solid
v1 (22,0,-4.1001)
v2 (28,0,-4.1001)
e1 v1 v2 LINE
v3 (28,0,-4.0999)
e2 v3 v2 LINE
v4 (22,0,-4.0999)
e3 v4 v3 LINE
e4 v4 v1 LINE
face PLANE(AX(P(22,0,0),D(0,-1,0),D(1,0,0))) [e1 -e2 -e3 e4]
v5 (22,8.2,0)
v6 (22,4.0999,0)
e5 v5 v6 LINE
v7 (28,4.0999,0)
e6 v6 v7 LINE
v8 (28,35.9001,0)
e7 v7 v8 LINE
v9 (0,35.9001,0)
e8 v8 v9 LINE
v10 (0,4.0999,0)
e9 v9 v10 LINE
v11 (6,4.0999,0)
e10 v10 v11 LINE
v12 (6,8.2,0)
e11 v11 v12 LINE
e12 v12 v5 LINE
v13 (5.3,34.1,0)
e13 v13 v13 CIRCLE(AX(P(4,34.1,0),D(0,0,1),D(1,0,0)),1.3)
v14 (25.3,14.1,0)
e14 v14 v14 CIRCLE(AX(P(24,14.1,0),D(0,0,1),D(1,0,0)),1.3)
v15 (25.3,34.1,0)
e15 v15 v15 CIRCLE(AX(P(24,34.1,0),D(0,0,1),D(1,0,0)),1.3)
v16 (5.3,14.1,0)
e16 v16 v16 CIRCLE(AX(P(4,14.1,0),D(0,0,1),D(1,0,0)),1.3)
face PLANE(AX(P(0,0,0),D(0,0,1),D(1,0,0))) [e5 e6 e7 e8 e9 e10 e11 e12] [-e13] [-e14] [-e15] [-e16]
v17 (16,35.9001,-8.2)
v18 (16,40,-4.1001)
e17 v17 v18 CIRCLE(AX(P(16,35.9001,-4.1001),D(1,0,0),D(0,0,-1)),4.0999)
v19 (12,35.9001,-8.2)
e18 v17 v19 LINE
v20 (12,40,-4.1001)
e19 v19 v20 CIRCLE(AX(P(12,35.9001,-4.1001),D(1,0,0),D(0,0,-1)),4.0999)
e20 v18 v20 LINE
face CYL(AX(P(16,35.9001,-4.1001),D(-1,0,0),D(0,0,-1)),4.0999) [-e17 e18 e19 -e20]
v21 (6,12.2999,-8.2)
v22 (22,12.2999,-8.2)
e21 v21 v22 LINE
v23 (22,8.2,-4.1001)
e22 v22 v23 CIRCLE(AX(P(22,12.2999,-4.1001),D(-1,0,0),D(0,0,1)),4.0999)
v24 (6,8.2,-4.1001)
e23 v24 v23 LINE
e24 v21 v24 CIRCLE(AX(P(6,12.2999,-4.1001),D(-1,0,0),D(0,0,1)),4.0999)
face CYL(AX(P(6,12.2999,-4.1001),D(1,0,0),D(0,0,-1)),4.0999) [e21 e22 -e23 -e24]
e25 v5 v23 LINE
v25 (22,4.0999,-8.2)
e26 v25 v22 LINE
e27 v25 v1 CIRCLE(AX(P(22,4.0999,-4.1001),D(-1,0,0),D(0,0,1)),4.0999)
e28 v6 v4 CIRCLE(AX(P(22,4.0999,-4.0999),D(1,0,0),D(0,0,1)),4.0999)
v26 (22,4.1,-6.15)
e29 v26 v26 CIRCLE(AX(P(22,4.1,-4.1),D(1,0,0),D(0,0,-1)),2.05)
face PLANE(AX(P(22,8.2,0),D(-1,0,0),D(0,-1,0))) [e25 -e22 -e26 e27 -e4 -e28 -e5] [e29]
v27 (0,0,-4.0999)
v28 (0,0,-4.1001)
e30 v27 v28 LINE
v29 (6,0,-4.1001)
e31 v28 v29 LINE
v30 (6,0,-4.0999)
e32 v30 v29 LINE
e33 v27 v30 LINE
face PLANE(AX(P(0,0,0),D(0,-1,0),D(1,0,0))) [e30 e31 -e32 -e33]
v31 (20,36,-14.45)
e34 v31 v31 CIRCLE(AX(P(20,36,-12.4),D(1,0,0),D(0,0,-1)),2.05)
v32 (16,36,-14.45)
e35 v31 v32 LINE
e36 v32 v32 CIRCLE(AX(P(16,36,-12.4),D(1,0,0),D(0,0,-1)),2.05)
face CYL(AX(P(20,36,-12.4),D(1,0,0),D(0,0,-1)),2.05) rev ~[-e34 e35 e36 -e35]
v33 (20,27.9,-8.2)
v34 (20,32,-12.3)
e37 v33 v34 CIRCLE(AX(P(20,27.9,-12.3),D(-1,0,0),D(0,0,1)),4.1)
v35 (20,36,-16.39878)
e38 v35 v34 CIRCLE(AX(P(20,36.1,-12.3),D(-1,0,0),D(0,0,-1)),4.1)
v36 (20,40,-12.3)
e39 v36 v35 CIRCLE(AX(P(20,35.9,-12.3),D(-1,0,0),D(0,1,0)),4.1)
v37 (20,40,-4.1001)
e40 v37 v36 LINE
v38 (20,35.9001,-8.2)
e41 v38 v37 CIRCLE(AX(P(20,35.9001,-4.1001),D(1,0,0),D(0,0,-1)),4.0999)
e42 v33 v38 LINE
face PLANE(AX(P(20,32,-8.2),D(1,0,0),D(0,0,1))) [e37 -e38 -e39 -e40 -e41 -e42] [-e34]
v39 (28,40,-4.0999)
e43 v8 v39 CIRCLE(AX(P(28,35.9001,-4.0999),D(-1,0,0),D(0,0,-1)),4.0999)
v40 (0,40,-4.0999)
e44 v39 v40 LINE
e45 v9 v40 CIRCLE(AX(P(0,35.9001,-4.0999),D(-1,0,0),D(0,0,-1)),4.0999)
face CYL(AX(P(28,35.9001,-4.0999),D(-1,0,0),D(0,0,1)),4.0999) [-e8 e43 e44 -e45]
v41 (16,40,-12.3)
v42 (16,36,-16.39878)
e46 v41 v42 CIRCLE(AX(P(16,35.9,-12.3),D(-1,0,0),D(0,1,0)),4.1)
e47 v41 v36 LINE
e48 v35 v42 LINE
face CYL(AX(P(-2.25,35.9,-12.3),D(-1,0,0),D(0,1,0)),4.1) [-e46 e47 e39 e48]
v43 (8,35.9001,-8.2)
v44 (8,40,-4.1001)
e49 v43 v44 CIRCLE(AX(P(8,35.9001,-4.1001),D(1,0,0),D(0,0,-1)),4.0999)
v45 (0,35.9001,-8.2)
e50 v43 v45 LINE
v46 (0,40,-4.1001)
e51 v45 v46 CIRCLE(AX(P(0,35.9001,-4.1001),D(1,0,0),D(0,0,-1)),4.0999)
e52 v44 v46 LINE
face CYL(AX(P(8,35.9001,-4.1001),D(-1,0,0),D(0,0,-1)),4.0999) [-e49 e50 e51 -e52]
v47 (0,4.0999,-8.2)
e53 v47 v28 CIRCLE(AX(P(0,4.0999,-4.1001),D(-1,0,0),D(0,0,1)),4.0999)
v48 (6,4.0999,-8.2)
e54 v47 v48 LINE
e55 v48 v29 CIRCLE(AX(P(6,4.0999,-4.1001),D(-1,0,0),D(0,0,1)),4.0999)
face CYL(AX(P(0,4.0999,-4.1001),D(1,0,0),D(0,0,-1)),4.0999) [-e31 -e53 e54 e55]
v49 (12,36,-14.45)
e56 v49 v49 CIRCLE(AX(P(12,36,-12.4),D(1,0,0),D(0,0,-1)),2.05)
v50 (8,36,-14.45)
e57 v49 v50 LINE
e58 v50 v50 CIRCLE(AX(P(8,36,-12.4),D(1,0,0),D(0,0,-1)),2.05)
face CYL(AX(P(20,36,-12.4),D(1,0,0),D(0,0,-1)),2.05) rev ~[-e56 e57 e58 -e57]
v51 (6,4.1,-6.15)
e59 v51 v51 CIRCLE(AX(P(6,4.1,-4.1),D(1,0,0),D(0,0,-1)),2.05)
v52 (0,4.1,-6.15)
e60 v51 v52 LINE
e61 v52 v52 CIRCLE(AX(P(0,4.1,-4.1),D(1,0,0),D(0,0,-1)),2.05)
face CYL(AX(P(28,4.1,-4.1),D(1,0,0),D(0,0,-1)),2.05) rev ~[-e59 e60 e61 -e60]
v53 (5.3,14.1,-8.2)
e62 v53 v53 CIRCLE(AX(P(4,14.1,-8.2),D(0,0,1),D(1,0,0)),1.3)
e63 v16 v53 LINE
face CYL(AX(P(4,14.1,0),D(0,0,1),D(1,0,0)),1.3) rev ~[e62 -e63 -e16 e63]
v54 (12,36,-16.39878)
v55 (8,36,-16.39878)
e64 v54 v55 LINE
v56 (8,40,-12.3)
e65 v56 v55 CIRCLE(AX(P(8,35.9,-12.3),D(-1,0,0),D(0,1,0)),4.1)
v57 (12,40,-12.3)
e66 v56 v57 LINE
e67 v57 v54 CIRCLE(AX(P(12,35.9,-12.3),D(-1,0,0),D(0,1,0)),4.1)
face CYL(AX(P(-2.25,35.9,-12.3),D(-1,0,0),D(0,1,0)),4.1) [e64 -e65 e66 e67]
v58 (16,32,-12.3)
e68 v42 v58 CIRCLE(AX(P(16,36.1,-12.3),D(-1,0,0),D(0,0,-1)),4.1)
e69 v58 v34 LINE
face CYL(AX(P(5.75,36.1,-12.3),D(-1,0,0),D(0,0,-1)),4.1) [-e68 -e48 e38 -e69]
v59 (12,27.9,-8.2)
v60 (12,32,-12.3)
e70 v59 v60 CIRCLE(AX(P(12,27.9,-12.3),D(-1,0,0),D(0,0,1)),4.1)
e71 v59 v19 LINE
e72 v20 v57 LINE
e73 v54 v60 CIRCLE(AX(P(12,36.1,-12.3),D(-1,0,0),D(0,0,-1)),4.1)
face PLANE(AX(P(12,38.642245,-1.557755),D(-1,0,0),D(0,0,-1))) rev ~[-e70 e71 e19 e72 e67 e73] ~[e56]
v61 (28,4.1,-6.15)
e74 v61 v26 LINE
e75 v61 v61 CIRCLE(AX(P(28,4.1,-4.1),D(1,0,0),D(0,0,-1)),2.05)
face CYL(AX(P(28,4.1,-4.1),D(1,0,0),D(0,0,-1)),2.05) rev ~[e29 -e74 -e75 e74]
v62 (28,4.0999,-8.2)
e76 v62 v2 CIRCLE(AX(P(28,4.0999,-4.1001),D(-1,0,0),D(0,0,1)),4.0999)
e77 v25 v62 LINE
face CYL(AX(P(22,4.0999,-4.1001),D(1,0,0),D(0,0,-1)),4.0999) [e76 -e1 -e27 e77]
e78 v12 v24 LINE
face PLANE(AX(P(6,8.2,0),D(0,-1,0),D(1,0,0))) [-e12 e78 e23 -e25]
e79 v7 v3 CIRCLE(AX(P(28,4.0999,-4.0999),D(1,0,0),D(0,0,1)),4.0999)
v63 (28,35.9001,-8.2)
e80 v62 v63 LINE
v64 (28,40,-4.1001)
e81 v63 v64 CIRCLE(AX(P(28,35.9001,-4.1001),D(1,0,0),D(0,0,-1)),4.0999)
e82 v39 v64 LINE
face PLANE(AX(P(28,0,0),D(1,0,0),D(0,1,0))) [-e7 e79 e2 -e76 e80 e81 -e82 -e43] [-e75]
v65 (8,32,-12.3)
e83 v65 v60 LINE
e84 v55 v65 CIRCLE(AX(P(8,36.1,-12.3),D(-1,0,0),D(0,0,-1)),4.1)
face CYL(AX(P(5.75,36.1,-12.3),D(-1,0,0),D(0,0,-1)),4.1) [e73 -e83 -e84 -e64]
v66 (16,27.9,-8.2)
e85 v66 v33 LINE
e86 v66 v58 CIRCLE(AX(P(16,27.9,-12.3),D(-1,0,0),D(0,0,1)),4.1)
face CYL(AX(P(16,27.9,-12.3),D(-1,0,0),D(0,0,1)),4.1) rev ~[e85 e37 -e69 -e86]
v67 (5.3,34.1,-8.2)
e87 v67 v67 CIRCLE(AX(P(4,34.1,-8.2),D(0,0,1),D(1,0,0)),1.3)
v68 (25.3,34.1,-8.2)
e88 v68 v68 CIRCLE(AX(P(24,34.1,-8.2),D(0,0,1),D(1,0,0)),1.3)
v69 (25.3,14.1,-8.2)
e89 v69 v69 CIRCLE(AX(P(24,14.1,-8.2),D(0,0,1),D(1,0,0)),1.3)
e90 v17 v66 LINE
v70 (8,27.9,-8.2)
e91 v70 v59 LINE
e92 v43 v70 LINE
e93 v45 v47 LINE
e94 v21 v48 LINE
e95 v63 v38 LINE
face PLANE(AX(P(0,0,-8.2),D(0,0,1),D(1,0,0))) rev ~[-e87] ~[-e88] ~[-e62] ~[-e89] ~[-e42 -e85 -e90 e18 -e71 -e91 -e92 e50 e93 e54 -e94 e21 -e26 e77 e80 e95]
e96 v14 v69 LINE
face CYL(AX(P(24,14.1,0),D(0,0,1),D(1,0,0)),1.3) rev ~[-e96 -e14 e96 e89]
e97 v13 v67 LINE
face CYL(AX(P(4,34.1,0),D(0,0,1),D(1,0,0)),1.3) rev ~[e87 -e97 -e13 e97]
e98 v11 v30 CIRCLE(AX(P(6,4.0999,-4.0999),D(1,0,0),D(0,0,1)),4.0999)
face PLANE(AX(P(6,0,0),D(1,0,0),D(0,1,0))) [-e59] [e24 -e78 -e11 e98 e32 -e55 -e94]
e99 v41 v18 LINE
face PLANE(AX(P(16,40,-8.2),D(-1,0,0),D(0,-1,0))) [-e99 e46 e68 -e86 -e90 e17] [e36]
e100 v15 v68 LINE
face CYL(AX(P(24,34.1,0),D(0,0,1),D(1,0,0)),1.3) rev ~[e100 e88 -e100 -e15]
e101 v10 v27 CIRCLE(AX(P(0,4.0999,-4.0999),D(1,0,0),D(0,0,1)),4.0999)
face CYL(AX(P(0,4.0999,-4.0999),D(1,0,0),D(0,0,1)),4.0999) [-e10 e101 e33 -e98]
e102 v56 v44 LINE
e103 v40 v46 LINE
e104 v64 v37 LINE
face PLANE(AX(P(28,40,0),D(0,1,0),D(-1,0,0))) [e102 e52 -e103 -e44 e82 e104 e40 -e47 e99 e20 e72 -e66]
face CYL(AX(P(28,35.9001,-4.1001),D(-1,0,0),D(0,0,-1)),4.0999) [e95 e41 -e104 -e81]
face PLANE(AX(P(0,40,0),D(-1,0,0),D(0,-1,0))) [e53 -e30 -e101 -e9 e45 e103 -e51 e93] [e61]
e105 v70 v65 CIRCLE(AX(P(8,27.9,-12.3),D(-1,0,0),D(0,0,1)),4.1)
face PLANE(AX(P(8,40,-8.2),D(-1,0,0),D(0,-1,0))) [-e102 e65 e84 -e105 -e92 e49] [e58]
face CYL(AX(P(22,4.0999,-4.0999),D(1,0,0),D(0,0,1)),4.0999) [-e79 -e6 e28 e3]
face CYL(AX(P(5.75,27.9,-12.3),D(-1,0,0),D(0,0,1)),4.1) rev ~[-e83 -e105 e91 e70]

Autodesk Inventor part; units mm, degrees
ref_plane "YZ Plane" through (0, 0, 0) normal (1, 0, 0) x (0, 1, 0)
ref_plane "XZ Plane" through (0, 0, 0) normal (0, 1, 0) x (-1, 0, 0)
ref_plane "XY Plane" through (0, 0, 0) normal (0, 0, 1) x (1, 0, 0)
sketch "Sketch1" plane through (0, 0, 0) normal (0, 0, 1) x (1, 0, 0)
  line L0 (0, 40) -> (0, 0)
  line L1 (0, 0) -> (6, 0)
  line L2 (6, 0) -> (6, 8.2)
  line L3 (6, 8.2) -> (22, 8.2)
  line L4 (22, 8.2) -> (22, 0)
  line L5 (22, 0) -> (28, 0)
  line L6 (28, 0) -> (28, 40)
  line L7 (28, 40) -> (0, 40)
  dimension "d0" = 6
  dimension "d1" = 6
  dimension "d2" = 16
  dimension "d3" = 40
  dimension "d4" = 8.2
extrude "Extrusion1" add sketch "Sketch1" against normal blind 8.2
sketch "Sketch2" plane through (28, 0, 0) normal (1, 0, 0) x (0, 0, -1)
  circle A0 centre (4.1, 4.1) radius 2.05
  line L0 (0, 0) -> (8.2, 0) projected
  line L1 (0, 0) -> (8.2, 0) projected
  point P0 (4.1, 0)
  dimension "d7" = 4.1
  dimension "d8" = 4.1
  dimension "d9" = 8.2
extrude "Extrusion2" cut sketch "Sketch2" against normal through all
fillet "Fillet1" radius 4.1 5 edges at (25, 0, 0) (3, 0, 0) (3, 0, -8.2) (25, 0, -8.2) (14, 8.2, -8.2)
sketch "Sketch3" plane through (0, 0, -8.2) normal (0, 0, -1) x (-1, 0, 0)
  line L0 (0, 40) -> (-28, 40) projected
  line L1 (-20, 40) -> (-16, 40)
  line L2 (-16, 40) -> (-16, 32)
  line L3 (-16, 32) -> (-20, 32)
  line L4 (-20, 32) -> (-20, 40)
  line L5 (-12, 40) -> (-8, 40)
  line L6 (-8, 40) -> (-8, 32)
  line L7 (-8, 32) -> (-12, 32)
  line L8 (-12, 32) -> (-12, 40)
  point P0 (0, 0)
  point P1 (-14, 40)
  dimension "d13" = 4
  dimension "d14" = 4
  dimension "d15" = 4
  dimension "d16" = 2
  dimension "d17" = 8
extrude "Extrusion3" add sketch "Sketch3" along normal blind 8.2
sketch "Sketch4" plane through (20, 32, -8.2) normal (1, 0, 0) x (0, 0, -1)
  circle A0 centre (4.2, 4) radius 2.05
  line L0 (8.2, 8) -> (8.2, 0) projected
  point P0 (-8.2, -32)
  dimension "d20" = 4.1
  dimension "d21" = 8
  dimension "d22" = 4
  dimension "d23" = 4
extrude "Extrusion4" cut sketch "Sketch4" against normal through all
fillet "Fillet2" radius 4.1 6 edges at (10, 40, -16.4) (18, 40, -16.4) (18, 32, -16.4) (10, 32, -16.4) (18, 32, -8.2) (10, 32, -8.2)
fillet "Fillet3" radius 4.1 4 edges at (14, 40, 0) (4, 40, -8.2) (14, 40, -8.2) (24, 40, -8.2)
sketch "Sketch5" plane through (0, 0, 0) normal (0, 0, 1) x (1, 0, 0)
  circle A0 centre (4, 34.1) radius 1.3
  line L0 (0, 35.9) -> (28, 35.9) construction
  line L1 (0, 35.9) -> (0, 4.1) construction
  circle A1 centre (4, 14.1) radius 1.3
  circle A2 centre (24, 34.1) radius 1.3
  circle A3 centre (24, 14.1) radius 1.3
  line L2 (28, 4.1) -> (28, 35.9) construction
  line L3 (6, 12.3) -> (22, 12.3) construction
  point P0 (0, 0)
  point P1 (14, 35.9)
  dimension "d30" = 20
  dimension "d33" = 20
  dimension "d36" = 1.8
  dimension "d37" = 10
  dimension "d38" = 2.6
  dimension "d42" = 23.6
extrude "Extrusion5" cut sketch "Sketch5" against normal up to surface (8.2 mm away)
equation "\"d0\" = d1"
equation "\"d4\" = 2 * arm_rod_diam"
equation "\"d5\" = 2 * arm_rod_diam"
equation "\"d7\" = arm_rod_diam"
equation "\"d8\" = 0.5 * d9"
equation "\"d12\" = arm_rod_diam"
equation "\"d13\" = d14"
equation "\"d16\" = 0.5 * d15"
equation "\"d18\" = 2 * arm_rod_diam"
equation "\"d20\" = arm_rod_diam"
equation "\"d22\" = 0.5 * d21"
equation "\"d23\" = d22"
equation "\"d26\" = arm_rod_diam"
equation "\"d27\" = arm_rod_diam"
equation "\"d36\" = -0.5 * d30 + 0.5 * d42"
equation "\"d37\" = 0.5 * d33"
equation "\"arm_rod_diam\" = 4.1"
properties part number "camera_arm" material "ABS Plastic"
